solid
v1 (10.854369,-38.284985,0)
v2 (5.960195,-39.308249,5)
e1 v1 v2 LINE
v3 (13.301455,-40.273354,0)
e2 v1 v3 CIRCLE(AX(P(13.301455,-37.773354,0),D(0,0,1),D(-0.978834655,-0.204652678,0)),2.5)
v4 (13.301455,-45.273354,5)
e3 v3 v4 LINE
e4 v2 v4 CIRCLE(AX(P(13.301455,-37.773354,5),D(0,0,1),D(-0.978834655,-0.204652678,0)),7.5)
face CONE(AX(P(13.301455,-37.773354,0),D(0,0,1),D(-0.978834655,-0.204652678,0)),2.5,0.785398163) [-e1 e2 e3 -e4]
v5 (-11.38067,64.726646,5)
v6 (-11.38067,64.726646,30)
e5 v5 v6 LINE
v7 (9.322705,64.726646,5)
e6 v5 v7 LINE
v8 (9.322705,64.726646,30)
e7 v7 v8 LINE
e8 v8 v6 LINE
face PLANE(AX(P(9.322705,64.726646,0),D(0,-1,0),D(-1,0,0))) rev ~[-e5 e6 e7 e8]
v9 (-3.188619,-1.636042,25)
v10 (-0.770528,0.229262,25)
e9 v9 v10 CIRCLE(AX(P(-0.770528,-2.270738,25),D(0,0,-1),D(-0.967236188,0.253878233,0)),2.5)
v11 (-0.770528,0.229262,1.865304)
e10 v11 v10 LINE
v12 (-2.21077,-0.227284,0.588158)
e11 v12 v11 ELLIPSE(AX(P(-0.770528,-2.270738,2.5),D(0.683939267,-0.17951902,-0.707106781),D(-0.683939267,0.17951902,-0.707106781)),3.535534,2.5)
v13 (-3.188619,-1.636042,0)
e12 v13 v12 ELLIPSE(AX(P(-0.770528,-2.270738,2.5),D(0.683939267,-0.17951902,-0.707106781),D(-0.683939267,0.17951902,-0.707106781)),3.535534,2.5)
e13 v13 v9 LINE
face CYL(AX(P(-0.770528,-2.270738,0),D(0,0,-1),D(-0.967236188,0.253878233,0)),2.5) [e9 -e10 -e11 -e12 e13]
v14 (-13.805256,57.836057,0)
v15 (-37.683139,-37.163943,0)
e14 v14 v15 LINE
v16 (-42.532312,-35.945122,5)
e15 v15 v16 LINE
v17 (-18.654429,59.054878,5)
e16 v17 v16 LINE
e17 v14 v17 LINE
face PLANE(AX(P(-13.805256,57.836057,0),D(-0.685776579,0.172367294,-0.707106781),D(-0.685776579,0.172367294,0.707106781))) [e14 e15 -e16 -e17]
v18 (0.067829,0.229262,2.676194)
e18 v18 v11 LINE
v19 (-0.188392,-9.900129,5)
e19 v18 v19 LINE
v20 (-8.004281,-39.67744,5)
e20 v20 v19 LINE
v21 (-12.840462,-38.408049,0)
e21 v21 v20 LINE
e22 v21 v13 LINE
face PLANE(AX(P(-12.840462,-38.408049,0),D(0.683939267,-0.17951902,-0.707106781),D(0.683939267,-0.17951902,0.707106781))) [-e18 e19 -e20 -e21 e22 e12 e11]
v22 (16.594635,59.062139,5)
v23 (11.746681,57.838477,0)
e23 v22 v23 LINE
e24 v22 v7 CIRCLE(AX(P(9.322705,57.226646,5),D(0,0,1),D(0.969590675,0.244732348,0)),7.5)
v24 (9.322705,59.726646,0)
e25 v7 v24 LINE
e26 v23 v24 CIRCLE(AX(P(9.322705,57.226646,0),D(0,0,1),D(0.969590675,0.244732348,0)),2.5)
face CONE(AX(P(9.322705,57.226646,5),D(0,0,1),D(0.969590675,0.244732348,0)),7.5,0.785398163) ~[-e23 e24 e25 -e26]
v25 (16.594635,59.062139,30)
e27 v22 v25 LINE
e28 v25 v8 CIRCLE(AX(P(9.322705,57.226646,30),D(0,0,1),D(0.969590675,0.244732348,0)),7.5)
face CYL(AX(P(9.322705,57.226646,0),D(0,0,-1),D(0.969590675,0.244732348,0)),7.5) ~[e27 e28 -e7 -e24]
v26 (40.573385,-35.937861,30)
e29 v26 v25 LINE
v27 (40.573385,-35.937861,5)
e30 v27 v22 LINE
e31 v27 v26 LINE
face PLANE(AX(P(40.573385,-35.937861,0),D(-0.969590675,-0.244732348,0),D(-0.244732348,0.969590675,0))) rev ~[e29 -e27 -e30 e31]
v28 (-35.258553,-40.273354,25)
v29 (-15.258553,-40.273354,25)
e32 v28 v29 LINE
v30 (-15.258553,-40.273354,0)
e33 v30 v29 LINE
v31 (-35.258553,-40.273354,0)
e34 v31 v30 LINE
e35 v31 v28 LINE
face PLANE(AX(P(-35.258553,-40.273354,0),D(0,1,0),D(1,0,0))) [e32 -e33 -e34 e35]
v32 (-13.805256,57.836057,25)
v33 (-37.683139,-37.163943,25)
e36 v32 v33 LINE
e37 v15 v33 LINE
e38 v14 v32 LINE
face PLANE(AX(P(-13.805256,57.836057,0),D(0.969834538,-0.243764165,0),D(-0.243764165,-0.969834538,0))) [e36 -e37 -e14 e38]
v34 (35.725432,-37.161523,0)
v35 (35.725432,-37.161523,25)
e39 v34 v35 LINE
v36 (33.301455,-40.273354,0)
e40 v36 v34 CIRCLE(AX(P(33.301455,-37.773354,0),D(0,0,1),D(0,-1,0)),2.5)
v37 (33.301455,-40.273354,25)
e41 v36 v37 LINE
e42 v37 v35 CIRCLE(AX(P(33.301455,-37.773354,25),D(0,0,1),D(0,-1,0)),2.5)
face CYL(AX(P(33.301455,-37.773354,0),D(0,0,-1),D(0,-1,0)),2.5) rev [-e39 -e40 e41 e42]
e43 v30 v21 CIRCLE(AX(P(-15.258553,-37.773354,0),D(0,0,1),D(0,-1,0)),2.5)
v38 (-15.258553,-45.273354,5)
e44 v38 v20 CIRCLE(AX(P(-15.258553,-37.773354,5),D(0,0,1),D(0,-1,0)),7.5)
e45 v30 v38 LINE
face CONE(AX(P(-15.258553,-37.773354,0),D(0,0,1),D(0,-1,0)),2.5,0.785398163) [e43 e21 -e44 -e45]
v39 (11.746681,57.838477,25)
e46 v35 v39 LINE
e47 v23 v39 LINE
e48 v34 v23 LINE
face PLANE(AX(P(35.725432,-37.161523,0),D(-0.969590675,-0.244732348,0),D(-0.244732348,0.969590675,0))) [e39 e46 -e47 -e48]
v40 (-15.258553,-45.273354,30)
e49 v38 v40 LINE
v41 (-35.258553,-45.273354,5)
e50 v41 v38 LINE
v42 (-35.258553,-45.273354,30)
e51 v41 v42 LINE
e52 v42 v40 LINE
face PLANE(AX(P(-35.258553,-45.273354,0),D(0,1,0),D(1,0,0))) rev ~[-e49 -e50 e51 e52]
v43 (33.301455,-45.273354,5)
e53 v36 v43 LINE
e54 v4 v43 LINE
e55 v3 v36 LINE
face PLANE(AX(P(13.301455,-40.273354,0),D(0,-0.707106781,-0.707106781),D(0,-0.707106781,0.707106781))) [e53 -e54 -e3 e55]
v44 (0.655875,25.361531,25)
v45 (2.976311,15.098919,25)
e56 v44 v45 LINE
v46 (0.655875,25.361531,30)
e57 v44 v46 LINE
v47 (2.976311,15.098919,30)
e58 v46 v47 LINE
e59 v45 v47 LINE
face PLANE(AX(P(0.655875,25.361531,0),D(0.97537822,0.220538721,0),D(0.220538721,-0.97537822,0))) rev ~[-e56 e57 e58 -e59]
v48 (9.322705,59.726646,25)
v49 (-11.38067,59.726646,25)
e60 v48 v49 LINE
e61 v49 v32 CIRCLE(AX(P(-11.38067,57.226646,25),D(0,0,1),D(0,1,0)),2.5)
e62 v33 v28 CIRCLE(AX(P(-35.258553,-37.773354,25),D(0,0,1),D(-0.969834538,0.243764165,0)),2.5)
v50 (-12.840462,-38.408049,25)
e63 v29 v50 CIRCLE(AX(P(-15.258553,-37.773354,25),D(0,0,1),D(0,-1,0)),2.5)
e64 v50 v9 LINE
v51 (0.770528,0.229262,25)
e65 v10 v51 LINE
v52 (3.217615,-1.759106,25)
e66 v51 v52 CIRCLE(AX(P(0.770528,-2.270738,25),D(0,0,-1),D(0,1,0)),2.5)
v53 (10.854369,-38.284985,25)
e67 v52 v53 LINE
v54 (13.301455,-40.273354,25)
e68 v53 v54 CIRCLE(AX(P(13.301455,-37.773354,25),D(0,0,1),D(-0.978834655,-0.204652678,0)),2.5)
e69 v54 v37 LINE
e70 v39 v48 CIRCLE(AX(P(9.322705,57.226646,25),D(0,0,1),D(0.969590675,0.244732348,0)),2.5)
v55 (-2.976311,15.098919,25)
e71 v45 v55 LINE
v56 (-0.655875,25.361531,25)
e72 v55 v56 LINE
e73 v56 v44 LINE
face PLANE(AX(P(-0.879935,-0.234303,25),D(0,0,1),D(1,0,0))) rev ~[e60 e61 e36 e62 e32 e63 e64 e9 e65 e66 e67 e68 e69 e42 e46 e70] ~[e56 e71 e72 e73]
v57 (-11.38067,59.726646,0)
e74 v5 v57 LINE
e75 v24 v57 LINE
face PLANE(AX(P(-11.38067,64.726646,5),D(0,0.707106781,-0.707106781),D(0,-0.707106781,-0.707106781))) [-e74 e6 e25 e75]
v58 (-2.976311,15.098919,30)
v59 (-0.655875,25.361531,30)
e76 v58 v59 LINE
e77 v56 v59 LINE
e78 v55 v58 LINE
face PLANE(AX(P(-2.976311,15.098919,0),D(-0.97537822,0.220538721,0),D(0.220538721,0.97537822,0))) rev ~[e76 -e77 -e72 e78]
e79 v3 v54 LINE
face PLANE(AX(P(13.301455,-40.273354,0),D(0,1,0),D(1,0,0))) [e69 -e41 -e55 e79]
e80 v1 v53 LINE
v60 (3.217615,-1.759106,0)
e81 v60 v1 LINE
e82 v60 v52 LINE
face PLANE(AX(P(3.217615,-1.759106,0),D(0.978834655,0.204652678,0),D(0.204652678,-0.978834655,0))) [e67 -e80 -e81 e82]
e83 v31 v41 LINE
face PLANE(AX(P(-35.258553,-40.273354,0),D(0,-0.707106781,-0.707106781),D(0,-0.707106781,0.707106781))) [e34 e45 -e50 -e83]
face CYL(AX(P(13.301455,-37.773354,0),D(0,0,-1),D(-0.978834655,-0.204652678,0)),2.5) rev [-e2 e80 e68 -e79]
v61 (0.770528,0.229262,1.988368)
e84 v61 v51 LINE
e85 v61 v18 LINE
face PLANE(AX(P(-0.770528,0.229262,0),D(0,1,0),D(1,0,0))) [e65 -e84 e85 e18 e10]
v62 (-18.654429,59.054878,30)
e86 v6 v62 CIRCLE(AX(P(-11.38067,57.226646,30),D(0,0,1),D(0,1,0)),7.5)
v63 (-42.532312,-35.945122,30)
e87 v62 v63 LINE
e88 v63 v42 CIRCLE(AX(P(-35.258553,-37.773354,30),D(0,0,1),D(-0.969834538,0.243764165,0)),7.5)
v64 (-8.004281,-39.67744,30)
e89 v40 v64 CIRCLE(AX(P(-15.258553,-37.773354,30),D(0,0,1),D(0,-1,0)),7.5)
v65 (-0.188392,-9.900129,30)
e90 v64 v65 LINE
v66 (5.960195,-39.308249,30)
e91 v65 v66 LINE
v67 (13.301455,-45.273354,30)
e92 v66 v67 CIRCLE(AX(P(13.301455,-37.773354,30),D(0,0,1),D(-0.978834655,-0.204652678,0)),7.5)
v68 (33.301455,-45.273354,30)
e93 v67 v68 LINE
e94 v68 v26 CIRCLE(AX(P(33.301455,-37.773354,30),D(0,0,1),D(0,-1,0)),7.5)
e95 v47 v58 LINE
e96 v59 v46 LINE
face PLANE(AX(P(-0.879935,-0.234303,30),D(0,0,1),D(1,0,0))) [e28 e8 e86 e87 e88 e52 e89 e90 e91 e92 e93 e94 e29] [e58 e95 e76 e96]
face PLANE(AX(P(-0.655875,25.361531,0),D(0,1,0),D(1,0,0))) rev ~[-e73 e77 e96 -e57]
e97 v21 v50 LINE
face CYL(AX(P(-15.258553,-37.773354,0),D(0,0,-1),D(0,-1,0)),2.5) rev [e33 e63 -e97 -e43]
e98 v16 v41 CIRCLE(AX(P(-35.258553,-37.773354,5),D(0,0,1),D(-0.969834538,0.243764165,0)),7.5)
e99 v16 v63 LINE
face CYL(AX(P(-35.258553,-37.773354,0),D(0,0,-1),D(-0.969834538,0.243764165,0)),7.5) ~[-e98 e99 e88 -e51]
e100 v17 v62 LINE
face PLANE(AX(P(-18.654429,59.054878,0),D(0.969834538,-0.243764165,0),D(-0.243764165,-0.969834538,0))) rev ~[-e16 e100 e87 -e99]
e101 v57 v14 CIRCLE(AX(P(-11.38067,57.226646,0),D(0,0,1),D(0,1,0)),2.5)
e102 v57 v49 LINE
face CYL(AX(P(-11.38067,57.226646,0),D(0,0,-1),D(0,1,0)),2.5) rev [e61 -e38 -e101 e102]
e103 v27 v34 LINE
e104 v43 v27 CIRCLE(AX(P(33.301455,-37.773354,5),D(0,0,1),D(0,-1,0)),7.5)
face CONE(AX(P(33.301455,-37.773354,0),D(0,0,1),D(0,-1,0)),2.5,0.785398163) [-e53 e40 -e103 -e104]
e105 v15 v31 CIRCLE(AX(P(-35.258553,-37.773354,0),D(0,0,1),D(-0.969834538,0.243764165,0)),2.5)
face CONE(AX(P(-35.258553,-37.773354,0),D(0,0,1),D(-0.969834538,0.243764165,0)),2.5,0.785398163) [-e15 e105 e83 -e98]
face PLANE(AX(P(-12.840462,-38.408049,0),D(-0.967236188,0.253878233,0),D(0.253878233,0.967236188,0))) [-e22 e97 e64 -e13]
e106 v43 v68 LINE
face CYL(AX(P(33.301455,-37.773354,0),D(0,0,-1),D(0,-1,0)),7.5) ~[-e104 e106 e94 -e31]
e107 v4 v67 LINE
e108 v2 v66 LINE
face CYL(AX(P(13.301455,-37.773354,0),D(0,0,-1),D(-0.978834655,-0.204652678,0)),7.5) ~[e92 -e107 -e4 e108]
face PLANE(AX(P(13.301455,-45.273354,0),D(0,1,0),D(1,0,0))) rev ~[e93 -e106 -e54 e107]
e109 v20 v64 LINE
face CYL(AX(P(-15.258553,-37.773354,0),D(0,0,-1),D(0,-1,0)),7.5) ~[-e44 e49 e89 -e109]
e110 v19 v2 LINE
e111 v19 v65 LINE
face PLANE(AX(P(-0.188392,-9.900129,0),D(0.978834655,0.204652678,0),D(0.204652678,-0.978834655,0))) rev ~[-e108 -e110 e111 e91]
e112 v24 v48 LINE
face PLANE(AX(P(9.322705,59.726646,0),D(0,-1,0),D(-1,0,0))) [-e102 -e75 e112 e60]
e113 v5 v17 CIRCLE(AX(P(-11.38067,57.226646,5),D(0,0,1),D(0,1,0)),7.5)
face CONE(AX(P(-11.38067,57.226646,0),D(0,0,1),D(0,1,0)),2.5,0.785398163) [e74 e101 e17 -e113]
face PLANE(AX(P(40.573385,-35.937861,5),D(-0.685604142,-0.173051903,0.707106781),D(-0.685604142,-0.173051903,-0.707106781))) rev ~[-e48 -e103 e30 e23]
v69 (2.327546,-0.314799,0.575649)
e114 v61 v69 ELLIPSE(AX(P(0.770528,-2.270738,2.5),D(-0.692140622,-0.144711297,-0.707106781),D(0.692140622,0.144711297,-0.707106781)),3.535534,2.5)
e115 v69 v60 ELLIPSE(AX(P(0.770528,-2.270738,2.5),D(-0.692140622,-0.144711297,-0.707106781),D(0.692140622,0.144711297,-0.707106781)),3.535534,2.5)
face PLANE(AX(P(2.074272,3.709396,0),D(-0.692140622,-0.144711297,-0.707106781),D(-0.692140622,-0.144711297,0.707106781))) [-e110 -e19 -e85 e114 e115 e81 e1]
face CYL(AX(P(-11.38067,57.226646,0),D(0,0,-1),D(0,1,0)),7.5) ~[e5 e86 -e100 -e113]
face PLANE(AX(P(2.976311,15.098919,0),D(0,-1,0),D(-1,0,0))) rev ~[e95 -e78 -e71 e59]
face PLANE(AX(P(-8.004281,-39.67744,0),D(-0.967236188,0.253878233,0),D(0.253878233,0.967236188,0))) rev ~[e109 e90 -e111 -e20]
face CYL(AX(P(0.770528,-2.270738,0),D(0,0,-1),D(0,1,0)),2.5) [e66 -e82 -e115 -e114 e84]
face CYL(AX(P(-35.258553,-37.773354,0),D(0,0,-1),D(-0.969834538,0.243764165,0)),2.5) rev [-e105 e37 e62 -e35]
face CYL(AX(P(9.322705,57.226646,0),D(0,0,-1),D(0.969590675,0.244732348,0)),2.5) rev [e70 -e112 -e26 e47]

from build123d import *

# Parameters (mm, degrees)
F1_DEPTH     = 30
F3_DEPTH     = 30
F4_DEPTH     = 25
F5_T1_DEPTH  = 97.9548533656
F5_T3_DEPTH  = 20
F5_T5_DEPTH  = 20.7033743208
F5_T7_DEPTH  = 97.9794901198
F5_T9_DEPTH  = 20
F5_T12_ANGLE = 75.8911885194
F5_T14_ANGLE = 104.1088114806
F5_T16_ANGLE = 75.2928746344
F5_T20_DEPTH = 43.6443917162
F5_T23_ANGLE = 75.8339831116
F5_T25_ANGLE = 104.1660168884
F5_T27_ANGLE = 78.1908320725
F5_T31_DEPTH = 42.9024259572
F5_T37_DEPTH = 42.9024259572
F5_T41_DEPTH = 43.6443917162


# Not quite as in the source:
# - a fillet or chamfer that OpenCascade refuses, or shapes differently, is made with other operations: its cross-section is extruded or revolved along the edge and cut away or added
# - the program builds the solid bodies; features that only make, move or delete a surface that nothing else refers to are left out


with BuildPart() as f1:
    # F0 (on Top) → F1 (new body)
    with BuildSketch(Plane.XY):
        with BuildLine():
            Line((9.3227045948, 64.7266464915), (-11.3806697261, 64.7266464915))
            ThreePointArc((-11.3806697261, 64.7266464915), (-15.9925167381, 63.1411090315), (-18.6544287642, 59.0548777281))
            Line((-18.6544287642, 59.0548777281), (-42.5323117917, -35.9451222719))
            ThreePointArc((-42.5323117917, -35.9451222719), (-41.1730152936, -42.3852005206), (-35.2585527536, -45.2733535085))
            Line((-35.2585527536, -45.2733535085), (-15.2585527536, -45.2733535085))
            ThreePointArc((-15.2585527536, -45.2733535085), (-10.6776494918, -43.7118150354), (-8.004281346, -39.6774402567))
            Line((-8.004281346, -39.6774402567), (-0.1883919579, -9.9001294455))
            Line((-0.1883919579, -9.9001294455), (5.9601953638, -39.3082485958))
            ThreePointArc((5.9601953638, -39.3082485958), (8.571852392, -43.5940799733), (13.3014552741, -45.2733535085))
            Line((13.3014552741, -45.2733535085), (33.3014552741, -45.2733535085))
            ThreePointArc((33.3014552741, -45.2733535085), (39.2182193635, -42.3822473792), (40.5733853395, -35.9378608981))
            Line((40.5733853395, -35.9378608981), (16.5946346602, 59.0621391019))
            ThreePointArc((16.5946346602, 59.0621391019), (13.9315984654, 63.1434105808), (9.3227045948, 64.7266464915))
        make_face()
        with BuildLine():
            ThreePointArc((9.3227045948, 59.7266464915), (10.8590025517, 59.1989011879), (11.7466812833, 57.8384773616))
            Line((11.7466812833, 57.8384773616), (35.7254319626, -37.1615226384))
            ThreePointArc((35.7254319626, -37.1615226384), (35.2737099706, -39.3096514654), (33.3014552741, -40.2733535085))
            Line((33.3014552741, -40.2733535085), (13.3014552741, -40.2733535085))
            ThreePointArc((13.3014552741, -40.2733535085), (11.72492098, -39.7135956635), (10.8543686373, -38.2849852043))
            Line((10.8543686373, -38.2849852043), (3.2176150905, -1.7591059289))
            ThreePointArc((3.2176150905, -1.7591059289), (2.3470627478, -0.3304954698), (0.7705284538, 0.2292623753))
            Line((0.7705284538, 0.2292623753), (-0.7705284538, 0.2292623753))
            ThreePointArc((-0.7705284538, 0.2292623753), (-2.2974962077, -0.2912504491), (-3.188618923, -1.6360420419))
            Line((-3.188618923, -1.6360420419), (-12.8404622844, -38.4080490913))
            ThreePointArc((-12.8404622844, -38.4080490913), (-13.7315849996, -39.7528406842), (-15.2585527536, -40.2733535085))
            Line((-15.2585527536, -40.2733535085), (-35.2585527536, -40.2733535085))
            ThreePointArc((-35.2585527536, -40.2733535085), (-37.2300402669, -39.3106358459), (-37.6831390996, -37.1639430963))
            Line((-37.6831390996, -37.1639430963), (-13.8052560721, 57.8360569037))
            ThreePointArc((-13.8052560721, 57.8360569037), (-12.9179520634, 59.1981340048), (-11.3806697261, 59.7266464915))
            Line((-11.3806697261, 59.7266464915), (9.3227045948, 59.7266464915))
        make_face(mode=Mode.SUBTRACT)
    extrude(amount=F1_DEPTH)

    # F0 (on Top) → F3 (join)
    with BuildSketch(Plane.XY):
        with BuildLine():
            Line((35.7254319626, -37.1615226384), (11.7466812833, 57.8384773616))
            ThreePointArc((11.7466812833, 57.8384773616), (10.8590025517, 59.1989011879), (9.3227045948, 59.7266464915))
            Line((9.3227045948, 59.7266464915), (-11.3806697261, 59.7266464915))
            ThreePointArc((-11.3806697261, 59.7266464915), (-12.9179520634, 59.1981340048), (-13.8052560721, 57.8360569037))
            Line((-13.8052560721, 57.8360569037), (-37.6831390996, -37.1639430963))
            ThreePointArc((-37.6831390996, -37.1639430963), (-37.2300402669, -39.3106358459), (-35.2585527536, -40.2733535085))
            Line((-35.2585527536, -40.2733535085), (-15.2585527536, -40.2733535085))
            ThreePointArc((-15.2585527536, -40.2733535085), (-13.7315849996, -39.7528406842), (-12.8404622844, -38.4080490913))
            Line((-12.8404622844, -38.4080490913), (-3.188618923, -1.6360420419))
            ThreePointArc((-3.188618923, -1.6360420419), (-2.2974962077, -0.2912504491), (-0.7705284538, 0.2292623753))
            Line((-0.7705284538, 0.2292623753), (0.7705284538, 0.2292623753))
            ThreePointArc((0.7705284538, 0.2292623753), (2.3470627478, -0.3304954698), (3.2176150905, -1.7591059289))
            Line((3.2176150905, -1.7591059289), (10.8543686373, -38.2849852043))
            ThreePointArc((10.8543686373, -38.2849852043), (11.72492098, -39.7135956635), (13.3014552741, -40.2733535085))
            Line((13.3014552741, -40.2733535085), (33.3014552741, -40.2733535085))
            ThreePointArc((33.3014552741, -40.2733535085), (35.2737099706, -39.3096514654), (35.7254319626, -37.1615226384))
        make_face()
        Polygon((2.9763113208, 15.0989185788), (-2.9763113208, 15.0989185788), (-0.655874512, 25.3615314645), (0.655874512, 25.3615314645), align=None, mode=Mode.SUBTRACT)
    extrude(amount=F3_DEPTH)

    # F0 (on Top) → F4 (cut)
    with BuildSketch(Plane.XY):
        with BuildLine():
            Line((35.7254319626, -37.1615226384), (11.7466812833, 57.8384773616))
            ThreePointArc((11.7466812833, 57.8384773616), (10.8590025517, 59.1989011879), (9.3227045948, 59.7266464915))
            Line((9.3227045948, 59.7266464915), (-11.3806697261, 59.7266464915))
            ThreePointArc((-11.3806697261, 59.7266464915), (-12.9179520634, 59.1981340048), (-13.8052560721, 57.8360569037))
            Line((-13.8052560721, 57.8360569037), (-37.6831390996, -37.1639430963))
            ThreePointArc((-37.6831390996, -37.1639430963), (-37.2300402669, -39.3106358459), (-35.2585527536, -40.2733535085))
            Line((-35.2585527536, -40.2733535085), (-15.2585527536, -40.2733535085))
            ThreePointArc((-15.2585527536, -40.2733535085), (-13.7315849996, -39.7528406842), (-12.8404622844, -38.4080490913))
            Line((-12.8404622844, -38.4080490913), (-3.188618923, -1.6360420419))
            ThreePointArc((-3.188618923, -1.6360420419), (-2.2974962077, -0.2912504491), (-0.7705284538, 0.2292623753))
            Line((-0.7705284538, 0.2292623753), (0.7705284538, 0.2292623753))
            ThreePointArc((0.7705284538, 0.2292623753), (2.3470627478, -0.3304954698), (3.2176150905, -1.7591059289))
            Line((3.2176150905, -1.7591059289), (10.8543686373, -38.2849852043))
            ThreePointArc((10.8543686373, -38.2849852043), (11.72492098, -39.7135956635), (13.3014552741, -40.2733535085))
            Line((13.3014552741, -40.2733535085), (33.3014552741, -40.2733535085))
            ThreePointArc((33.3014552741, -40.2733535085), (35.2737099706, -39.3096514654), (35.7254319626, -37.1615226384))
        make_face()
        Polygon((2.9763113208, 15.0989185788), (-2.9763113208, 15.0989185788), (-0.655874512, 25.3615314645), (0.655874512, 25.3615314645), align=None, mode=Mode.SUBTRACT)
    extrude(amount=F4_DEPTH, mode=Mode.SUBTRACT)

    # F5: chamfer of 5 on 1 edges, made by hand

    # F5_s2 → F5_t1 (cut)
    with BuildSketch(Plane(origin=(12.8527529512, 51.135669312, 0), x_dir=(0, 0, 1), z_dir=(-0.2437641649, -0.9698345384, 0))):
        Polygon((0, 27.4871722621), (5, 32.4871722621), (0, 32.4871722621), align=None)
    extrude(amount=F5_T1_DEPTH, mode=Mode.SUBTRACT)

    # F5_s4 → F5_t3 (cut)
    with BuildSketch(Plane.YZ.offset(-35.2585527536)):
        Polygon((-40.2733535085, 0), (-45.2733535085, 5), (-45.2733535085, 0), align=None)
    extrude(amount=F5_T3_DEPTH, mode=Mode.SUBTRACT)

    # F5_s6 → F5_t5 (cut)
    with BuildSketch(Plane.YZ.offset(-11.3806697261)):
        Polygon((64.7266464915, 5), (59.7266464915, 0), (64.7266464915, 0), align=None)
    extrude(amount=F5_T5_DEPTH, mode=Mode.SUBTRACT)

    # F5_s8 → F5_t7 (cut)
    with BuildSketch(Plane(origin=(10.9578014799, -43.4130682832, 0), x_dir=(0, 0, 1), z_dir=(-0.2447323481, 0.9695906754, 0))):
        Polygon((5, 30.5444190123), (0, 25.5444190123), (0, 30.5444190123), align=None)
    extrude(amount=F5_T7_DEPTH, mode=Mode.SUBTRACT)

    # F5_s10 → F5_t9 (cut)
    with BuildSketch(Plane.YZ.offset(13.3014552741)):
        Polygon((-40.2733535085, 0), (-45.2733535085, 5), (-45.2733535085, 0), align=None)
    extrude(amount=F5_T9_DEPTH, mode=Mode.SUBTRACT)

    # F5_s11 → F5_t12 (revolve, cut)
    with BuildSketch(Plane.YZ.offset(-11.3806697261)):
        Polygon((59.7266464915, 0), (64.7266464915, 5), (64.7266464915, 0), align=None)
    revolve(axis=Axis((-11.3806697261, 57.2266464915, 0), (0, 0, 1)), revolution_arc=F5_T12_ANGLE, mode=Mode.SUBTRACT)

    # F5_s13 → F5_t14 (revolve, cut)
    with BuildSketch(Plane(origin=(-11.0251300763, -43.864330688, 0), x_dir=(0, 0, 1), z_dir=(0.2437641649, 0.9698345384, 0))):
        Polygon((0, -27.4871722621), (5, -32.4871722621), (0, -32.4871722621), align=None)
    revolve(axis=Axis((-35.2585527536, -37.7733535085, 0), (0, 0, 1)), revolution_arc=F5_T14_ANGLE, mode=Mode.SUBTRACT)

    # F5_s15 → F5_t16 (revolve, cut)
    with BuildSketch(Plane.YZ.offset(-15.2585527536)):
        Polygon((-40.2733535085, 0), (-45.2733535085, 5), (-45.2733535085, 0), align=None)
    revolve(axis=Axis((-15.2585527536, -37.7733535085, 0), (0, 0, 1)), revolution_arc=F5_T16_ANGLE, mode=Mode.SUBTRACT)


with BuildPart() as f5_tool18:
    # F5_s19 → F5_t20 (new body)
    with BuildSketch(Plane(origin=(-10.2591099413, -39.0855973263, 0), x_dir=(0, 0, 1), z_dir=(0.2538782331, 0.9672361877, 0))):
        Polygon((0, -2.6687921481), (5, 2.3312078519), (0, 2.3312078519), align=None)
    extrude(amount=F5_T20_DEPTH)

    split(bisect_by=Plane(origin=(-2.1637067448, -0.4523832276, 0), x_dir=(0, 0, 1), z_dir=(-0.9788346547, -0.2046526783, 0)), keep=Keep.TOP)


with BuildPart() as f1_1:
    add(f1.part)

    # F5_t17: cut F5_tool18
    add(f5_tool18.part, mode=Mode.SUBTRACT)

    # F5_s22 → F5_t23 (revolve, cut)
    with BuildSketch(Plane(origin=(-13.0209491994, 51.5869317168, 0), x_dir=(0, 0, 1), z_dir=(0.2447323481, -0.9695906754, 0))):
        Polygon((5, -30.5444190123), (0, -25.5444190123), (0, -30.5444190123), align=None)
    revolve(axis=Axis((9.3227045948, 57.2266464915, 0), (0, 0, 1)), revolution_arc=F5_T23_ANGLE, mode=Mode.SUBTRACT)

    # F5_s24 → F5_t25 (revolve, cut)
    with BuildSketch(Plane.YZ.offset(33.3014552741)):
        Polygon((-40.2733535085, 0), (-45.2733535085, 5), (-45.2733535085, 0), align=None)
    revolve(axis=Axis((33.3014552741, -37.7733535085, 0), (0, 0, 1)), revolution_arc=F5_T25_ANGLE, mode=Mode.SUBTRACT)

    # F5_s26 → F5_t27 (revolve, cut)
    with BuildSketch(Plane(origin=(8.1239021086, -38.8558653682, 0), x_dir=(0, 0, 1), z_dir=(-0.2046526783, 0.9788346547, 0))):
        Polygon((0, 2.7895074164), (5, -2.2104925836), (0, -2.2104925836), align=None)
    revolve(axis=Axis((13.3014552741, -37.7733535085, 0), (0, 0, 1)), revolution_arc=F5_T27_ANGLE, mode=Mode.SUBTRACT)


with BuildPart() as f5_tool29:
    # F5_s30 → F5_t31 (new body)
    with BuildSketch(Plane(origin=(-0.6561942692, 3.1385159299, 0), x_dir=(0, 0, 1), z_dir=(0.2046526783, -0.9788346547, 0))):
        Polygon((0, -2.7895074164), (5, 2.2104925836), (0, 2.2104925836), align=None)
    extrude(amount=F5_T31_DEPTH)

    split(bisect_by=Plane(origin=(2.2548285953, -0.5918429304, 0), x_dir=(0, 0, 1), z_dir=(0.9672361877, -0.2538782331, 0)), keep=Keep.TOP)


with BuildPart() as f1_2:
    add(f1_1.part)

    # F5_t28: cut F5_tool29
    add(f5_tool29.part, mode=Mode.SUBTRACT)


with BuildPart() as f5_tool35:
    # F5_s36 → F5_t37 (new body)
    with BuildSketch(Plane(origin=(-0.6561942692, 3.1385159299, 0), x_dir=(0, 0, 1), z_dir=(0.2046526783, -0.9788346547, 0))):
        Polygon((0, -2.7895074164), (5, 2.2104925836), (0, 2.2104925836), align=None)
    extrude(amount=F5_T37_DEPTH)

    split(bisect_by=Plane(origin=(2.2548285953, -0.5918429304, 0), x_dir=(0, 0, 1), z_dir=(-0.9672361877, 0.2538782331, 0)), keep=Keep.TOP)


with BuildPart() as f5_tool39:
    # F5_s40 → F5_t41 (new body)
    with BuildSketch(Plane(origin=(-10.2591099413, -39.0855973263, 0), x_dir=(0, 0, 1), z_dir=(0.2538782331, 0.9672361877, 0))):
        Polygon((0, -2.6687921481), (5, 2.3312078519), (0, 2.3312078519), align=None)
    extrude(amount=F5_T41_DEPTH)

    split(bisect_by=Plane(origin=(-2.1637067448, -0.4523832276, 0), x_dir=(0, 0, 1), z_dir=(0.9788346547, 0.2046526783, 0)), keep=Keep.TOP)


with BuildPart() as f5_tool35_1:
    add(f5_tool35.part)

    # F5_t43: intersect F5_tool39
    add(f5_tool39.part, mode=Mode.INTERSECT)


with BuildPart() as f1_3:
    add(f1_2.part)

    # F5_t33: cut F5_tool35
    add(f5_tool35_1.part, mode=Mode.SUBTRACT)


solid = f1_3.part
